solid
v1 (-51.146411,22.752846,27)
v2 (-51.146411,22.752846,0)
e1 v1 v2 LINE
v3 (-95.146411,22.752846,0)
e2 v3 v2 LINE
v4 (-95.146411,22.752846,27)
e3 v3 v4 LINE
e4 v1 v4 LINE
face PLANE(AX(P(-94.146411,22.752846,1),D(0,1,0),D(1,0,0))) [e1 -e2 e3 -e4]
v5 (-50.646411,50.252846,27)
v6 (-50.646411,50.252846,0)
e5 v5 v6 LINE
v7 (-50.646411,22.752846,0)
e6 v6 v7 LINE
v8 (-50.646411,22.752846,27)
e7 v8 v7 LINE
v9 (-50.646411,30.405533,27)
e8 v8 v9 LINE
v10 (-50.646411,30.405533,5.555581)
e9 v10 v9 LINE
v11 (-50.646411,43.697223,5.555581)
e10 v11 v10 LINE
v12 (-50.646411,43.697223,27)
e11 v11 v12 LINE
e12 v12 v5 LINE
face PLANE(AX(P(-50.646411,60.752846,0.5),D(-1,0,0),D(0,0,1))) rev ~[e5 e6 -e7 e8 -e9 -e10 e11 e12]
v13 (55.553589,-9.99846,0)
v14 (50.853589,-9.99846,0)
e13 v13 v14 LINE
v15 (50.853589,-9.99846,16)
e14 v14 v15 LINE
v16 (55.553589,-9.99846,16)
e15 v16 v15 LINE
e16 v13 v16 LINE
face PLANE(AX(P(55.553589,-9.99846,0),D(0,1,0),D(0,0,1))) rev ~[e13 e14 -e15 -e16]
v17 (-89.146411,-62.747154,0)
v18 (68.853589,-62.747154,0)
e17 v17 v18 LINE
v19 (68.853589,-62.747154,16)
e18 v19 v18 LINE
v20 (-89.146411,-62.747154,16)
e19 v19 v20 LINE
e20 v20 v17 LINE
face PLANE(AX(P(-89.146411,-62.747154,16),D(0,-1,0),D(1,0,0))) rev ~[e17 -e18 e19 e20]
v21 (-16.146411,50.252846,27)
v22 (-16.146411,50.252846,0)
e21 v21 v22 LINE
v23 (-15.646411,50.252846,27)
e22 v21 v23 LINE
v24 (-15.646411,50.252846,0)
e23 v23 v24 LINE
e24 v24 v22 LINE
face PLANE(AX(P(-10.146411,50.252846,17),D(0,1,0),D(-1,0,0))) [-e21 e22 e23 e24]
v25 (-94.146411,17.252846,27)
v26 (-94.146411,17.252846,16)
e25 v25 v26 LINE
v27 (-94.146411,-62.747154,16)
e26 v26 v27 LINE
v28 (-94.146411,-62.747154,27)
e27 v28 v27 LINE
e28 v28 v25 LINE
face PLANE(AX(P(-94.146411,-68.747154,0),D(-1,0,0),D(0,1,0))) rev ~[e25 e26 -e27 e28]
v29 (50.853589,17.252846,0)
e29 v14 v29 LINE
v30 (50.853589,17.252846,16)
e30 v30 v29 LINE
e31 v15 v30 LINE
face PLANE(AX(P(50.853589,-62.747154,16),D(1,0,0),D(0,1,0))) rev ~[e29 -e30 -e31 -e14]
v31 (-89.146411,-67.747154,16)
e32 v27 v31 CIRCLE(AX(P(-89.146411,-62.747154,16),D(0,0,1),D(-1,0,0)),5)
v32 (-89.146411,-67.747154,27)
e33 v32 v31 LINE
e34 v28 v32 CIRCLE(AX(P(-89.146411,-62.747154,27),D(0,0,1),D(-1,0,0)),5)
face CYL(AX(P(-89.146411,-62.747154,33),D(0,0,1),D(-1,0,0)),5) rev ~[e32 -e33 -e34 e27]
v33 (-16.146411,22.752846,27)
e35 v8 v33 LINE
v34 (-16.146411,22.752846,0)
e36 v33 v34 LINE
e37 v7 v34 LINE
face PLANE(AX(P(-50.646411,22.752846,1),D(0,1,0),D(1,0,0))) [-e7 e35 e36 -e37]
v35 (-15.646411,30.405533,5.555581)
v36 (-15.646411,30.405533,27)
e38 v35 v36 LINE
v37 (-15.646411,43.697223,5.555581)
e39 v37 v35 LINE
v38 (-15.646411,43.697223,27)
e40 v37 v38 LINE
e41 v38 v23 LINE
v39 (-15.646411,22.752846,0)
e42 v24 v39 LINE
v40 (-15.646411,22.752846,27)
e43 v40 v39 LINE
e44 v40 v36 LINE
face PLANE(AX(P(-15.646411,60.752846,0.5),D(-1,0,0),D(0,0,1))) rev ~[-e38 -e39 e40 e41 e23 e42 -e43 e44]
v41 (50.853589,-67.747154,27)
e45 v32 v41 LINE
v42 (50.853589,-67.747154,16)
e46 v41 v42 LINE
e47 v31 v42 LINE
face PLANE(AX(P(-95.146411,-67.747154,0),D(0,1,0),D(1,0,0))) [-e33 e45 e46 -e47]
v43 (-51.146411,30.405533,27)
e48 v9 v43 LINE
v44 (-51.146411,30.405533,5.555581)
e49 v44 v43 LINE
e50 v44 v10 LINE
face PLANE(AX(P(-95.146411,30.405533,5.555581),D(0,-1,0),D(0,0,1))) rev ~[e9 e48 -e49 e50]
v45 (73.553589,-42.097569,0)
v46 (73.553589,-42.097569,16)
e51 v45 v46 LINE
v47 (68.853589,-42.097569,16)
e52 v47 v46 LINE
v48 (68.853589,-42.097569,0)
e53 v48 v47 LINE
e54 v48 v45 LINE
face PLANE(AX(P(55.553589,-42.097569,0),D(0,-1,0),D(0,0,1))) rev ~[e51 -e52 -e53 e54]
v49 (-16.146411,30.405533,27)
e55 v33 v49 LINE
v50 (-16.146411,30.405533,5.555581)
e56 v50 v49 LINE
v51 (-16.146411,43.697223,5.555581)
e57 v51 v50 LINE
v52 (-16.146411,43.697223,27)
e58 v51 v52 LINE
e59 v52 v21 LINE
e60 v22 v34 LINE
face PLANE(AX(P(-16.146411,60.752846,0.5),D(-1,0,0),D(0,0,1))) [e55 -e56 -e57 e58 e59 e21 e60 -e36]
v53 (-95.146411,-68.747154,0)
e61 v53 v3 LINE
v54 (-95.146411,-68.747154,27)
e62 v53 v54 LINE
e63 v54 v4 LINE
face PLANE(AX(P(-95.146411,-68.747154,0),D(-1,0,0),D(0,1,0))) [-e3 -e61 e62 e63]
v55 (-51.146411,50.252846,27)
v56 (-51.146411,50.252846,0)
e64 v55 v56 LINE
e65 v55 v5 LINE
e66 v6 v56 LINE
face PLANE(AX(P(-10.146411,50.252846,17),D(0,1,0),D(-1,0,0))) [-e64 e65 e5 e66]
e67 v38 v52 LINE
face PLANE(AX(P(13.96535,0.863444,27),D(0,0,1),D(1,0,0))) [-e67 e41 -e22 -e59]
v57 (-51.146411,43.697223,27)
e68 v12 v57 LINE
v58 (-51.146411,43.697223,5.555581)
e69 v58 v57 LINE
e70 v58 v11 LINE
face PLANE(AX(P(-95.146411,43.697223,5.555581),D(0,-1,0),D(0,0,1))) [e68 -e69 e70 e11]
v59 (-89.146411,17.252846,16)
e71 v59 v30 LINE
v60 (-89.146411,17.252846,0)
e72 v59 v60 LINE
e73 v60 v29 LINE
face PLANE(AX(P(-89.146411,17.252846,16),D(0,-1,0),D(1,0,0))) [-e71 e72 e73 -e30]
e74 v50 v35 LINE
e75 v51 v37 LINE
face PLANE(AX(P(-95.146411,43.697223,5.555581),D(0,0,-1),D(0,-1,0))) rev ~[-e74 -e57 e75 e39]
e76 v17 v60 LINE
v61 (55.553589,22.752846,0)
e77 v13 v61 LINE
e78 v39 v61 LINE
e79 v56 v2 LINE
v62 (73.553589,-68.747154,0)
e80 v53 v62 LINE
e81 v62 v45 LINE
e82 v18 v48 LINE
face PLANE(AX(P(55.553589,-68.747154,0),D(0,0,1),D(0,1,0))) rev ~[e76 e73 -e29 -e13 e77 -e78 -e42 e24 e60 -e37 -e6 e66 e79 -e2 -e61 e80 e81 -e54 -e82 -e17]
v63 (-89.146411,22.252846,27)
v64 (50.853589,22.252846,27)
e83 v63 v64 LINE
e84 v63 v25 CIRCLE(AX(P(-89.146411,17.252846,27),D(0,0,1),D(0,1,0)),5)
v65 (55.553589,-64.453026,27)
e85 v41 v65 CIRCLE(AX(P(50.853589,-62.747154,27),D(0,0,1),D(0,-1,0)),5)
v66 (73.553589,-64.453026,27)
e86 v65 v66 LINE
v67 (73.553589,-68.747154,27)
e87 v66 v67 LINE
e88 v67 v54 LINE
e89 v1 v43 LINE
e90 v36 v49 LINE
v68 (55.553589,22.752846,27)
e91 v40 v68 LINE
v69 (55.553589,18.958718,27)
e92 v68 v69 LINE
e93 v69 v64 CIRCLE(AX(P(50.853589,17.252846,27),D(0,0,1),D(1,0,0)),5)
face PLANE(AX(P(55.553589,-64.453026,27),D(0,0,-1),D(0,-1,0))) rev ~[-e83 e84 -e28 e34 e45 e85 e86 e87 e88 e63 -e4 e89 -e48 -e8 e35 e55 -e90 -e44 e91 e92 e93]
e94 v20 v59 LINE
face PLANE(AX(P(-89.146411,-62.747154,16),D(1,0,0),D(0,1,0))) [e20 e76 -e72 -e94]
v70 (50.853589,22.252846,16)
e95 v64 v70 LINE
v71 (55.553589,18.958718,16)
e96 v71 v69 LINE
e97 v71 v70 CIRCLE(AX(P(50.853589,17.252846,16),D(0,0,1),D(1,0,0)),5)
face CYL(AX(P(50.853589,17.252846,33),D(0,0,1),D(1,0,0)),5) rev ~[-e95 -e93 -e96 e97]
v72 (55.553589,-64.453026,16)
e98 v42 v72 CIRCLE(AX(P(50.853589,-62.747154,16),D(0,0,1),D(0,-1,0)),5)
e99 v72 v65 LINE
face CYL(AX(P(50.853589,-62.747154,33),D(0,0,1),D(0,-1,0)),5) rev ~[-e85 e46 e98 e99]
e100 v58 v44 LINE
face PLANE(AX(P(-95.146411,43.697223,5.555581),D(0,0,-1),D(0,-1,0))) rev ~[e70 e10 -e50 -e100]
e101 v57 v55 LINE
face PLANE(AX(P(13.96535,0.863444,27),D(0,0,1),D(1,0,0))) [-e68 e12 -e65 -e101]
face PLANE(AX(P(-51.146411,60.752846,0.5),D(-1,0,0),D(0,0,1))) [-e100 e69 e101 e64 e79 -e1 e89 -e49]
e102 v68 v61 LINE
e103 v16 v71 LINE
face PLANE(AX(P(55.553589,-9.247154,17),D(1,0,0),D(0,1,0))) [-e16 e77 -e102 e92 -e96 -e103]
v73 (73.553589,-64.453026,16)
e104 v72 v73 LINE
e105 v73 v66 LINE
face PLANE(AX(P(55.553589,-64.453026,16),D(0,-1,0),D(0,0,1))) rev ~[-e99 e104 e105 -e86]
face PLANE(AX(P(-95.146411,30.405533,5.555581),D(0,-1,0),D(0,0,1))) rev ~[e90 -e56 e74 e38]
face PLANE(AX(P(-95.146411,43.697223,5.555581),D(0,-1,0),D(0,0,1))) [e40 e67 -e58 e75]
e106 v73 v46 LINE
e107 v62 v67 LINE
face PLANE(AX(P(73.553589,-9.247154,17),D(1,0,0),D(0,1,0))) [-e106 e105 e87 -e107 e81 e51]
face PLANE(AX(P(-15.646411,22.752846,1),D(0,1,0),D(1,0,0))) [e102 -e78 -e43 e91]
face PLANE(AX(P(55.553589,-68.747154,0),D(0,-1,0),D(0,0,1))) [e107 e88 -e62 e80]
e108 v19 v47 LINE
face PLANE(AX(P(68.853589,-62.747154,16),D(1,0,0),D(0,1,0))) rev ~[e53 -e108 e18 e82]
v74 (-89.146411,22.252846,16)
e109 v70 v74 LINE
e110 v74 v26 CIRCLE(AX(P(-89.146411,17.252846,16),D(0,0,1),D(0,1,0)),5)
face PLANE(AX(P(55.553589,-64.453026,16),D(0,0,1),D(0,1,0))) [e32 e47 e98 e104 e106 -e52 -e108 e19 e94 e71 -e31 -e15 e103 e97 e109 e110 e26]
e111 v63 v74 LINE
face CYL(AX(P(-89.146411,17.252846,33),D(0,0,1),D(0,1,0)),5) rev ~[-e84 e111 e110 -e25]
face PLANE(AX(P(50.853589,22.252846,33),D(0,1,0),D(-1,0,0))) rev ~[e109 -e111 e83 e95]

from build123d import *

# Parameters (mm, degrees)
F0_W          = 170
F0_H          = 130
F1_DEPTH      = 34
F2_T          = -1
F3_W          = 43.5
F3_H          = 38
F4_DEPTH      = 32
F5_T          = 0.5
F5_T3_DEPTH   = 34
F5_T5_DEPTH   = 125.5
F5_T7_DEPTH   = 33
F5_T9_DEPTH   = 2
F5_T11_DEPTH  = 129
F5_T13_DEPTH  = 169
F5_T15_DEPTH  = 91
F5_T17_DEPTH  = 44.5
F5_T19_DEPTH  = 39
F6_W          = 35
F6_H          = 38
F7_DEPTH      = 32
F8_T          = 0.5
F8_T3_DEPTH   = 2
F8_T5_DEPTH   = 33
F8_T7_DEPTH   = 91
F8_T9_DEPTH   = 34
F8_T11_DEPTH  = 79.5
F8_T13_DEPTH  = 169
F8_T15_DEPTH  = 129
F8_T17_DEPTH  = 90.5
F8_T19_DEPTH  = 39
F8_T21_DEPTH  = 44.5
F8_T23_DEPTH  = 33.5
F8_T25_DEPTH  = 1.5
F8_T27_DEPTH  = 39
F8_T29_DEPTH  = 33
F8_T31_DEPTH  = 1.5
F8_T33_DEPTH  = 1.5
F8_T35_DEPTH  = 38.5
F8_T37_DEPTH  = 1.5000245068
F8_T39_DEPTH  = 1.5000245068
F8_T41_DEPTH  = 44
F9_W          = 89.5
F9_H          = 38
F10_DEPTH     = 32
F11_T         = 0.5
F11_T3_DEPTH  = 2
F11_T5_DEPTH  = 33
F11_T7_DEPTH  = 91
F11_T9_DEPTH  = 34
F11_T11_DEPTH = 169
F11_T13_DEPTH = 44.5
F11_T15_DEPTH = 33.5
F11_T17_DEPTH = 1.5
F11_T19_DEPTH = 39
F11_T21_DEPTH = 33
F11_T23_DEPTH = 1.5
F11_T25_DEPTH = 1.5
F11_T27_DEPTH = 38.5
F11_T29_DEPTH = 1.5000245068
F11_T31_DEPTH = 1.5000245068
F11_T33_DEPTH = 44
F11_T35_DEPTH = 35.5
F12_W         = 150
F12_H         = 90
F13_DEPTH     = 32
F15_DEPTH     = 17
F16_W         = 140
F16_H         = 80
F17_DEPTH     = 25
F18_DEPTH     = 25
F19_DEPTH     = 25
F20_DEPTH     = 25
F21_DEPTH     = 25
F24_W         = 170
F24_H         = 34
F25_DEPTH     = 11
F26_W         = 119
F26_H         = 34
F27_DEPTH     = 19.3
F28_W         = 32.0991082117
F28_H         = 16
F29_DEPTH     = 25
F30_W         = 13.2916904986
F30_H         = 28.4444186985
F31_DEPTH     = 96.3
F32_W         = 236.7293909192
F32_H         = 199.1855278611
F33_DEPTH     = 7
F34_DEPTH     = 18
F35_DEPTH     = 18
F36_DEPTH     = 27.5


# Not quite as in the source:
# - a feature of the source that left no trace in its solid (it failed there, or was rolled back) is left out
# - a shell that OpenCascade refuses in one call is made with other operations: the cavity is built on its own and cut out


with BuildPart() as f1:
    # F0 (on Top) → F1 (new body)
    with BuildSketch(Plane.XY):
        with Locations((-10.1464114764, -3.7471540272)):
            Rectangle(F0_W, F0_H)
    extrude(amount=F1_DEPTH)

    # F2
    f2_openings = [f1.faces().sort_by_distance(p)[0] for p in [
        (-10.146411, -3.747154, 34),
    ]]
    offset(amount=F2_T, openings=f2_openings)

    # F3 (on face) → F4 (join)
    with BuildSketch(Plane.XY.offset(1)):
        with Locations((-72.3964114764, 41.2528459728)):
            Rectangle(F3_W, F3_H)
    extrude(amount=F4_DEPTH)

    # F5: shell of thickness 0.5, made by hand


with BuildPart() as f5_core1:
    # F5_t2: copy of F1
    add(f1.part)

    # the walls: a layer under each face that stays
    f5_faces = [f5_core1.faces().sort_by_distance(p)[0] for p in [
        (-10.1464114764, 61.2528459728, 17),
        (74.8535885236, -3.7471540272, 17),
        (-95.1464114764, -3.7471540272, 17),
        (-10.1464114764, -3.7471540272, 0),
        (-3.5057864764, -68.2121746034, 34),
        (-10.1464114764, -68.7471540272, 17),
        (-10.1464114764, 60.2528459728, 17.5),
        (73.8535885236, -3.7471540272, 17.5),
        (-10.1464114764, -67.7471540272, 17.5),
        (-94.1464114764, -3.7471540272, 17.5),
        (-10.1464114764, -3.7471540272, 1),
        (-50.6464114764, 41.2528459728, 17),
        (-72.3964114764, 22.2528459728, 17),
    ]]
    thicken(f5_faces, amount=-F5_T, mode=Mode.SUBTRACT)

    # F5_s4 → F5_t3 (cut)
    with BuildSketch(Plane.XY.offset(0.5)):
        Polygon((73.8485885236, 60.2478459728), (73.8535885236, 60.7528459728), (74.3535885236, 60.7528459728), (74.3535885236, 60.2528459728), align=None)
        Polygon((73.8485885236, -67.7421540272), (74.3535885236, -67.7471540272), (74.3535885236, -68.2471540272), (73.8535885236, -68.2471540272), align=None)
        Polygon((-94.1414114764, -67.7421540272), (-94.1464114764, -68.2471540272), (-94.6464114764, -68.2471540272), (-94.6464114764, -67.7471540272), align=None)
    extrude(amount=F5_T3_DEPTH, mode=Mode.SUBTRACT)

    # F5_s6 → F5_t5 (cut)
    with BuildSketch(Plane.YZ.offset(-51.1464114764)):
        Polygon((60.2478459728, 1.005), (60.7528459728, 1), (60.7528459728, 0.5), (60.2528459728, 0.5), align=None)
    extrude(amount=F5_T5_DEPTH, mode=Mode.SUBTRACT)

    # F5_s8 → F5_t7 (cut)
    with BuildSketch(Plane.XY.offset(0.5)):
        Polygon((-50.6414114764, 60.2478459728), (-50.6464114764, 60.7528459728), (-51.1464114764, 60.7528459728), (-51.1464114764, 60.2528459728), align=None)
        Polygon((-94.1414114764, 22.2478459728), (-94.6464114764, 22.2528459728), (-94.6464114764, 22.7528459728), (-94.1464114764, 22.7528459728), align=None)
    extrude(amount=F5_T7_DEPTH, mode=Mode.SUBTRACT)

    # F5_s10 → F5_t9 (cut)
    with BuildSketch(Plane.XY.offset(32.5)):
        Polygon((-94.1414114764, 60.2478459728), (-94.1464114764, 60.7528459728), (-94.6464114764, 60.7528459728), (-94.6464114764, 60.2528459728), align=None)
    extrude(amount=F5_T9_DEPTH, mode=Mode.SUBTRACT)

    # F5_s12 → F5_t11 (cut)
    with BuildSketch(Plane.XZ.offset(-60.7528459728)):
        Polygon((73.8485885236, 1.005), (74.3535885236, 1), (74.3535885236, 0.5), (73.8535885236, 0.5), align=None)
    extrude(amount=F5_T11_DEPTH, mode=Mode.SUBTRACT)

    # F5_s14 → F5_t13 (cut)
    with BuildSketch(Plane.YZ.offset(-94.6464114764)):
        Polygon((-67.7421540272, 1.005), (-68.2471540272, 1), (-68.2471540272, 0.5), (-67.7471540272, 0.5), align=None)
    extrude(amount=F5_T13_DEPTH, mode=Mode.SUBTRACT)

    # F5_s16 → F5_t15 (cut)
    with BuildSketch(Plane.XZ.offset(-22.7528459728)):
        Polygon((-94.1414114764, 1.005), (-94.6464114764, 1), (-94.6464114764, 0.5), (-94.1464114764, 0.5), align=None)
    extrude(amount=F5_T15_DEPTH, mode=Mode.SUBTRACT)

    # F5_s18 → F5_t17 (cut)
    with BuildSketch(Plane.YZ.offset(-94.6464114764)):
        Polygon((22.2478459728, 1.005), (22.2528459728, 0.5), (22.7528459728, 0.5), (22.7528459728, 1), align=None)
    extrude(amount=F5_T17_DEPTH, mode=Mode.SUBTRACT)

    # F5_s20 → F5_t19 (cut)
    with BuildSketch(Plane.XZ.offset(-60.7528459728)):
        Polygon((-50.6414114764, 1.005), (-50.6464114764, 0.5), (-51.1464114764, 0.5), (-51.1464114764, 1), align=None)
    extrude(amount=F5_T19_DEPTH, mode=Mode.SUBTRACT)


with BuildPart() as f1_1:
    add(f1.part)

    # what is left inside the walls is the cavity
    f5_cavity = [f5_core1.part.solids().sort_by_distance(p)[0] for p in [
        (-72.896411, 35.419513, 0.505),
    ]]
    add(f5_cavity, mode=Mode.SUBTRACT)

    # F6 (on face) → F7 (join)
    with BuildSketch(Plane.XY.offset(1)):
        with Locations((-33.1464114764, 41.2528459728)):
            Rectangle(F6_W, F6_H)
    extrude(amount=F7_DEPTH)

    # F8: shell of thickness 0.5, made by hand


with BuildPart() as f8_core1:
    # F8_t2: copy of F1
    add(f1_1.part)

    # the walls: a layer under each face that stays
    f8_faces = [f8_core1.faces().sort_by_distance(p)[0] for p in [
        (-10.1464114764, 61.2528459728, 17),
        (-3.5057864764, -68.2121746034, 34),
        (-94.1464114764, -3.7471540272, 17.5),
        (-10.1464114764, -3.7471540272, 1),
        (-15.6464114764, 41.2528459728, 17),
        (-54.8964114764, 22.2528459728, 17),
        (-72.8964114764, 22.7528459728, 16.75),
        (-94.6464114764, 41.7528459728, 16.75),
        (-94.3939114764, 60.2503459728, 32.75),
        (-94.1439114764, 60.5003459728, 32.75),
        (-72.6464114764, 60.5028459728, 33),
        (-94.3939114764, 60.5003459728, 32.5),
        (-72.8964114764, 60.7528459728, 16.75),
        (-72.8964114764, 41.7528459728, 0.5),
        (-51.1464114764, 41.7528459728, 16.75),
        (-94.3964114764, 41.5028459728, 33),
        (-10.1464114764, -67.7471540272, 17.5),
        (73.8535885236, -3.7471540272, 17.5),
        (-10.1464114764, 60.2528459728, 17.5),
        (-10.1464114764, -68.7471540272, 17),
        (-10.1464114764, -3.7471540272, 0),
        (-95.1464114764, -3.7471540272, 17),
        (74.8535885236, -3.7471540272, 17),
    ]]
    thicken(f8_faces, amount=-F8_T, mode=Mode.SUBTRACT)

    # F8_s4 → F8_t3 (cut)
    with BuildSketch(Plane.XY.offset(32.5)):
        Polygon((-94.1414114764, 60.2478459728), (-94.6464114764, 60.2528459728), (-94.6464114764, 60.7528459728), (-94.1464114764, 60.7528459728), align=None)
    extrude(amount=F8_T3_DEPTH, mode=Mode.SUBTRACT)

    # F8_s6 → F8_t5 (cut)
    with BuildSketch(Plane.XY.offset(0.5)):
        Polygon((-94.1414114764, 22.2478459728), (-94.6464114764, 22.2528459728), (-94.6464114764, 22.7528459728), (-94.1464114764, 22.7528459728), align=None)
        Polygon((-15.6414114764, 60.2478459728), (-16.1464114764, 60.2528459728), (-16.1464114764, 60.7528459728), (-15.6464114764, 60.7528459728), align=None)
    extrude(amount=F8_T5_DEPTH, mode=Mode.SUBTRACT)

    # F8_s8 → F8_t7 (cut)
    with BuildSketch(Plane.XZ.offset(-22.7528459728)):
        Polygon((-94.1414114764, 1.005), (-94.6464114764, 1), (-94.6464114764, 0.5), (-94.1464114764, 0.5), align=None)
    extrude(amount=F8_T7_DEPTH, mode=Mode.SUBTRACT)

    # F8_s10 → F8_t9 (cut)
    with BuildSketch(Plane.XY.offset(0.5)):
        Polygon((-94.1414114764, -67.7421540272), (-94.6464114764, -67.7471540272), (-94.6464114764, -68.2471540272), (-94.1464114764, -68.2471540272), align=None)
        Polygon((73.8485885236, -67.7421540272), (73.8535885236, -68.2471540272), (74.3535885236, -68.2471540272), (74.3535885236, -67.7471540272), align=None)
        Polygon((73.8485885236, 60.2478459728), (74.3535885236, 60.2528459728), (74.3535885236, 60.7528459728), (73.8535885236, 60.7528459728), align=None)
    extrude(amount=F8_T9_DEPTH, mode=Mode.SUBTRACT)

    # F8_s12 → F8_t11 (cut)
    with BuildSketch(Plane.YZ.offset(-94.6464114764)):
        Polygon((22.2478459728, 1.005), (22.2528459728, 0.5), (22.7528459728, 0.5), (22.7528459728, 1), align=None)
    extrude(amount=F8_T11_DEPTH, mode=Mode.SUBTRACT)

    # F8_s14 → F8_t13 (cut)
    with BuildSketch(Plane.YZ.offset(-94.6464114764)):
        Polygon((-67.7421540272, 1.005), (-67.7471540272, 0.5), (-68.2471540272, 0.5), (-68.2471540272, 1), align=None)
    extrude(amount=F8_T13_DEPTH, mode=Mode.SUBTRACT)

    # F8_s16 → F8_t15 (cut)
    with BuildSketch(Plane.XZ.offset(-60.7528459728)):
        Polygon((73.8485885236, 1.005), (73.8535885236, 0.5), (74.3535885236, 0.5), (74.3535885236, 1), align=None)
    extrude(amount=F8_T15_DEPTH, mode=Mode.SUBTRACT)

    # F8_s18 → F8_t17 (cut)
    with BuildSketch(Plane.YZ.offset(-16.1464114764)):
        Polygon((60.2478459728, 1.005), (60.2528459728, 0.5), (60.7528459728, 0.5), (60.7528459728, 1), align=None)
    extrude(amount=F8_T17_DEPTH, mode=Mode.SUBTRACT)

    # F8_s20 → F8_t19 (cut)
    with BuildSketch(Plane.XZ.offset(-60.7528459728)):
        Polygon((-15.6414114764, 1.005), (-15.6464114764, 0.5), (-16.1464114764, 0.5), (-16.1464114764, 1), align=None)
    extrude(amount=F8_T19_DEPTH, mode=Mode.SUBTRACT)

    # F8_s22 → F8_t21 (cut)
    with BuildSketch(Plane.YZ.offset(-95.1464114764)):
        Polygon((22.7578459728, 0.505), (22.2528459728, 0.5), (22.2528459728, 0), (22.7528459728, 0), align=None)
        Polygon((60.7478459728, 0.505), (61.2528459728, 0.5), (61.2528459728, 0), (60.7528459728, 0), align=None)
    extrude(amount=F8_T21_DEPTH, mode=Mode.SUBTRACT)

    # F8_s24 → F8_t23 (cut)
    with BuildSketch(Plane.XY):
        Polygon((-94.6414114764, 22.7578459728), (-94.6464114764, 22.2528459728), (-95.1464114764, 22.2528459728), (-95.1464114764, 22.7528459728), align=None)
        Polygon((-51.1514114764, 22.7578459728), (-51.1464114764, 22.2528459728), (-50.6464114764, 22.2528459728), (-50.6464114764, 22.7528459728), align=None)
        Polygon((-51.1514114764, 60.7478459728), (-51.1464114764, 61.2528459728), (-50.6464114764, 61.2528459728), (-50.6464114764, 60.7528459728), align=None)
    extrude(amount=F8_T23_DEPTH, mode=Mode.SUBTRACT)

    # F8_s26 → F8_t25 (cut)
    with BuildSketch(Plane.YZ.offset(-95.1464114764)):
        Polygon((22.7578459728, 32.995), (22.2528459728, 33), (22.2528459728, 33.5), (22.7528459728, 33.5), align=None)
        Polygon((60.7478459728, 32.495), (60.7528459728, 33), (61.2528459728, 33), (61.2528459728, 32.5), align=None)
    extrude(amount=F8_T25_DEPTH, mode=Mode.SUBTRACT)

    # F8_s28 → F8_t27 (cut)
    with BuildSketch(Plane.XZ.offset(-61.2528459728)):
        Polygon((-94.6414114764, 0.505), (-95.1464114764, 0.5), (-95.1464114764, 0), (-94.6464114764, 0), align=None)
        Polygon((-51.1514114764, 0.505), (-51.1464114764, 0), (-50.6464114764, 0), (-50.6464114764, 0.5), align=None)
    extrude(amount=F8_T27_DEPTH, mode=Mode.SUBTRACT)

    # F8_s30 → F8_t29 (cut)
    with BuildSketch(Plane.XY):
        Polygon((-94.6414114764, 60.7478459728), (-95.1464114764, 60.7528459728), (-95.1464114764, 61.2528459728), (-94.6464114764, 61.2528459728), align=None)
    extrude(amount=F8_T29_DEPTH, mode=Mode.SUBTRACT)

    # F8_s32 → F8_t31 (cut)
    with BuildSketch(Plane.XZ.offset(-61.2528459728)):
        Polygon((-94.6414114764, 32.495), (-95.1464114764, 32.5), (-95.1464114764, 33), (-94.6464114764, 33), align=None)
        Polygon((-51.1514114764, 32.995), (-51.1464114764, 33.5), (-50.6464114764, 33.5), (-50.6464114764, 33), align=None)
    extrude(amount=F8_T31_DEPTH, mode=Mode.SUBTRACT)

    # F8_s34 → F8_t33 (cut)
    with BuildSketch(Plane.XY.offset(32)):
        Polygon((-94.6414609789, 60.2478462179), (-95.1464114764, 60.2528459728), (-95.1464114764, 60.7578209747), (-94.641461224, 60.7528214672), align=None)
        Polygon((-94.1414117215, 60.7478954753), (-94.6463869708, 60.7478957204), (-94.6513864783, 61.2528459728), (-94.1464114764, 61.2528459728), align=None)
    extrude(amount=F8_T33_DEPTH, mode=Mode.SUBTRACT)

    # F8_s36 → F8_t35 (cut)
    with BuildSketch(Plane.XZ.offset(-60.7528459728)):
        Polygon((-94.6414114764, 32.995), (-95.1464114764, 33), (-95.1464114764, 33.5), (-94.6464114764, 33.5), align=None)
    extrude(amount=F8_T35_DEPTH, mode=Mode.SUBTRACT)

    # F8_s38 → F8_t37 (cut)
    with BuildSketch(Plane(origin=(-95.7336140862, 0.9478575652, 0), x_dir=(0, 0, 1), z_dir=(0.9999509888, -0.0099005048, 0))):
        Polygon((32.995, -59.3078456537), (33, -59.8128456537), (33.5, -59.8128456537), (33.5, -59.3128456537), align=None)
    extrude(amount=F8_T37_DEPTH, mode=Mode.SUBTRACT)

    # F8_s40 → F8_t39 (cut)
    with BuildSketch(Plane(origin=(-0.6007818495, 60.6789668039, 0), x_dir=(0, 0, 1), z_dir=(-0.0099005048, 0.9999509888, 0))):
        Polygon((32.995, -93.5353134023), (33, -94.0403134023), (33.5, -94.0403134023), (33.5, -93.5403134023), align=None)
    extrude(amount=F8_T39_DEPTH, mode=Mode.SUBTRACT)

    # F8_s42 → F8_t41 (cut)
    with BuildSketch(Plane.YZ.offset(-94.6464114764)):
        Polygon((60.7478459728, 32.995), (60.7528459728, 33.5), (61.2528459728, 33.5), (61.2528459728, 33), align=None)
    extrude(amount=F8_T41_DEPTH, mode=Mode.SUBTRACT)


with BuildPart() as f1_2:
    add(f1_1.part)

    # what is left inside the walls is the cavity
    f8_cavity = [f8_core1.part.solids().sort_by_distance(p)[0] for p in [
        (-33.396411, 35.419513, 32.995),
    ]]
    add(f8_cavity, mode=Mode.SUBTRACT)

    # F9 (on face) → F10 (join)
    with BuildSketch(Plane.XY.offset(1)):
        with Locations((29.1035885236, 41.2528459728)):
            Rectangle(F9_W, F9_H)
    extrude(amount=F10_DEPTH)

    # F11: shell of thickness 0.5, made by hand


with BuildPart() as f11_core1:
    # F11_t2: copy of F1
    add(f1_2.part)

    # the walls: a layer under each face that stays
    f11_faces = [f11_core1.faces().sort_by_distance(p)[0] for p in [
        (-10.1464114764, 61.2528459728, 17),
        (-3.5057864764, -68.2121746034, 34),
        (-94.1464114764, -3.7471540272, 17.5),
        (-10.1464114764, -22.7471540272, 1),
        (-10.1464114764, 22.2528459728, 17),
        (-72.8964114764, 22.7528459728, 16.75),
        (-94.6464114764, 41.7528459728, 16.75),
        (-94.3939114764, 60.2503459728, 32.75),
        (-94.1439114764, 60.5003459728, 32.75),
        (-72.6464114764, 60.5028459728, 33),
        (-94.3939114764, 60.5003459728, 32.5),
        (-72.8964114764, 60.7528459728, 16.75),
        (-72.8964114764, 41.7528459728, 0.5),
        (-51.1464114764, 41.7528459728, 16.75),
        (-50.6464114764, 41.7528459728, 16.75),
        (-33.3964114764, 60.7528459728, 16.75),
        (-33.3964114764, 41.7528459728, 0.5),
        (-33.3964114764, 60.5028459728, 33),
        (-33.3964114764, 22.7528459728, 16.75),
        (-16.1464114764, 41.7528459728, 16.75),
        (-94.3964114764, 41.5028459728, 33),
        (-10.1464114764, -67.7471540272, 17.5),
        (73.8535885236, -3.7471540272, 17.5),
        (-10.1464114764, 60.2528459728, 33.5),
        (-10.1464114764, -68.7471540272, 17),
        (-10.1464114764, -3.7471540272, 0),
        (-95.1464114764, -3.7471540272, 17),
        (74.8535885236, -3.7471540272, 17),
    ]]
    thicken(f11_faces, amount=-F11_T, mode=Mode.SUBTRACT)

    # F11_s4 → F11_t3 (cut)
    with BuildSketch(Plane.XY.offset(32.5)):
        Polygon((-94.1414114764, 60.2478459728), (-94.6464114764, 60.2528459728), (-94.6464114764, 60.7528459728), (-94.1464114764, 60.7528459728), align=None)
        Polygon((73.8485885236, 60.2478459728), (74.3535885236, 60.2528459728), (74.3535885236, 60.7528459728), (73.8535885236, 60.7528459728), align=None)
    extrude(amount=F11_T3_DEPTH, mode=Mode.SUBTRACT)

    # F11_s6 → F11_t5 (cut)
    with BuildSketch(Plane.XY.offset(0.5)):
        Polygon((-94.1414114764, 22.2478459728), (-94.6464114764, 22.2528459728), (-94.6464114764, 22.7528459728), (-94.1464114764, 22.7528459728), align=None)
        Polygon((73.8485885236, 22.2478459728), (73.8535885236, 22.7528459728), (74.3535885236, 22.7528459728), (74.3535885236, 22.2528459728), align=None)
    extrude(amount=F11_T5_DEPTH, mode=Mode.SUBTRACT)

    # F11_s8 → F11_t7 (cut)
    with BuildSketch(Plane.XZ.offset(-22.7528459728)):
        Polygon((-94.1414114764, 1.005), (-94.6464114764, 1), (-94.6464114764, 0.5), (-94.1464114764, 0.5), align=None)
        Polygon((73.8485885236, 1.005), (73.8535885236, 0.5), (74.3535885236, 0.5), (74.3535885236, 1), align=None)
    extrude(amount=F11_T7_DEPTH, mode=Mode.SUBTRACT)

    # F11_s10 → F11_t9 (cut)
    with BuildSketch(Plane.XY.offset(0.5)):
        Polygon((-94.1414114764, -67.7421540272), (-94.6464114764, -67.7471540272), (-94.6464114764, -68.2471540272), (-94.1464114764, -68.2471540272), align=None)
        Polygon((73.8485885236, -67.7421540272), (73.8535885236, -68.2471540272), (74.3535885236, -68.2471540272), (74.3535885236, -67.7471540272), align=None)
    extrude(amount=F11_T9_DEPTH, mode=Mode.SUBTRACT)

    # F11_s12 → F11_t11 (cut)
    with BuildSketch(Plane.YZ.offset(-94.6464114764)):
        Polygon((22.2478459728, 1.005), (22.2528459728, 0.5), (22.7528459728, 0.5), (22.7528459728, 1), align=None)
        Polygon((-67.7421540272, 1.005), (-67.7471540272, 0.5), (-68.2471540272, 0.5), (-68.2471540272, 1), align=None)
    extrude(amount=F11_T11_DEPTH, mode=Mode.SUBTRACT)

    # F11_s14 → F11_t13 (cut)
    with BuildSketch(Plane.YZ.offset(-95.1464114764)):
        Polygon((22.7578459728, 0.505), (22.2528459728, 0.5), (22.2528459728, 0), (22.7528459728, 0), align=None)
        Polygon((60.7478459728, 0.505), (61.2528459728, 0.5), (61.2528459728, 0), (60.7528459728, 0), align=None)
    extrude(amount=F11_T13_DEPTH, mode=Mode.SUBTRACT)

    # F11_s16 → F11_t15 (cut)
    with BuildSketch(Plane.XY):
        Polygon((-94.6414114764, 22.7578459728), (-94.6464114764, 22.2528459728), (-95.1464114764, 22.2528459728), (-95.1464114764, 22.7528459728), align=None)
        Polygon((-51.1514114764, 22.7578459728), (-51.1464114764, 22.2528459728), (-50.6464114764, 22.2528459728), (-50.6464114764, 22.7528459728), align=None)
        Polygon((-51.1514114764, 60.7478459728), (-51.1464114764, 61.2528459728), (-50.6464114764, 61.2528459728), (-50.6464114764, 60.7528459728), align=None)
        Polygon((-50.6414114764, 22.7578459728), (-51.1464114764, 22.7528459728), (-51.1464114764, 22.2528459728), (-50.6464114764, 22.2528459728), align=None)
        Polygon((-50.6414114764, 60.7478459728), (-51.1464114764, 60.7528459728), (-51.1464114764, 61.2528459728), (-50.6464114764, 61.2528459728), align=None)
        Polygon((-16.1514114764, 60.7478459728), (-16.1464114764, 61.2528459728), (-15.6464114764, 61.2528459728), (-15.6464114764, 60.7528459728), align=None)
        Polygon((-16.1514114764, 22.7578459728), (-16.1464114764, 22.2528459728), (-15.6464114764, 22.2528459728), (-15.6464114764, 22.7528459728), align=None)
    extrude(amount=F11_T15_DEPTH, mode=Mode.SUBTRACT)

    # F11_s18 → F11_t17 (cut)
    with BuildSketch(Plane.YZ.offset(-95.1464114764)):
        Polygon((22.7578459728, 32.995), (22.2528459728, 33), (22.2528459728, 33.5), (22.7528459728, 33.5), align=None)
        Polygon((60.7478459728, 32.495), (60.7528459728, 33), (61.2528459728, 33), (61.2528459728, 32.5), align=None)
    extrude(amount=F11_T17_DEPTH, mode=Mode.SUBTRACT)

    # F11_s20 → F11_t19 (cut)
    with BuildSketch(Plane.XZ.offset(-61.2528459728)):
        Polygon((-94.6414114764, 0.505), (-95.1464114764, 0.5), (-95.1464114764, 0), (-94.6464114764, 0), align=None)
        Polygon((-51.1514114764, 0.505), (-51.1464114764, 0), (-50.6464114764, 0), (-50.6464114764, 0.5), align=None)
        Polygon((-50.6414114764, 0.505), (-51.1464114764, 0.5), (-51.1464114764, 0), (-50.6464114764, 0), align=None)
        Polygon((-16.1514114764, 0.505), (-16.1464114764, 0), (-15.6464114764, 0), (-15.6464114764, 0.5), align=None)
    extrude(amount=F11_T19_DEPTH, mode=Mode.SUBTRACT)

    # F11_s22 → F11_t21 (cut)
    with BuildSketch(Plane.XY):
        Polygon((-94.6414114764, 60.7478459728), (-95.1464114764, 60.7528459728), (-95.1464114764, 61.2528459728), (-94.6464114764, 61.2528459728), align=None)
    extrude(amount=F11_T21_DEPTH, mode=Mode.SUBTRACT)

    # F11_s24 → F11_t23 (cut)
    with BuildSketch(Plane.XZ.offset(-61.2528459728)):
        Polygon((-94.6414114764, 32.495), (-95.1464114764, 32.5), (-95.1464114764, 33), (-94.6464114764, 33), align=None)
        Polygon((-51.1514114764, 32.995), (-51.1464114764, 33.5), (-50.6464114764, 33.5), (-50.6464114764, 33), align=None)
        Polygon((-50.6414114764, 32.995), (-51.1464114764, 33), (-51.1464114764, 33.5), (-50.6464114764, 33.5), align=None)
        Polygon((-16.1514114764, 32.995), (-16.1464114764, 33.5), (-15.6464114764, 33.5), (-15.6464114764, 33), align=None)
    extrude(amount=F11_T23_DEPTH, mode=Mode.SUBTRACT)

    # F11_s26 → F11_t25 (cut)
    with BuildSketch(Plane.XY.offset(32)):
        Polygon((-94.6414609789, 60.2478462179), (-95.1464114764, 60.2528459728), (-95.1464114764, 60.7578209747), (-94.641461224, 60.7528214672), align=None)
        Polygon((-94.1414117215, 60.7478954753), (-94.6463869708, 60.7478957204), (-94.6513864783, 61.2528459728), (-94.1464114764, 61.2528459728), align=None)
    extrude(amount=F11_T25_DEPTH, mode=Mode.SUBTRACT)

    # F11_s28 → F11_t27 (cut)
    with BuildSketch(Plane.XZ.offset(-60.7528459728)):
        Polygon((-94.6414114764, 32.995), (-95.1464114764, 33), (-95.1464114764, 33.5), (-94.6464114764, 33.5), align=None)
    extrude(amount=F11_T27_DEPTH, mode=Mode.SUBTRACT)

    # F11_s30 → F11_t29 (cut)
    with BuildSketch(Plane(origin=(-95.7336140862, 0.9478575652, 0), x_dir=(0, 0, 1), z_dir=(0.9999509888, -0.0099005048, 0))):
        Polygon((32.995, -59.3078456537), (33, -59.8128456537), (33.5, -59.8128456537), (33.5, -59.3128456537), align=None)
    extrude(amount=F11_T29_DEPTH, mode=Mode.SUBTRACT)

    # F11_s32 → F11_t31 (cut)
    with BuildSketch(Plane(origin=(-0.6007818495, 60.6789668039, 0), x_dir=(0, 0, 1), z_dir=(-0.0099005048, 0.9999509888, 0))):
        Polygon((32.995, -93.5353134023), (33, -94.0403134023), (33.5, -94.0403134023), (33.5, -93.5403134023), align=None)
    extrude(amount=F11_T31_DEPTH, mode=Mode.SUBTRACT)

    # F11_s34 → F11_t33 (cut)
    with BuildSketch(Plane.YZ.offset(-94.6464114764)):
        Polygon((60.7478459728, 32.995), (60.7528459728, 33.5), (61.2528459728, 33.5), (61.2528459728, 33), align=None)
    extrude(amount=F11_T33_DEPTH, mode=Mode.SUBTRACT)

    # F11_s36 → F11_t35 (cut)
    with BuildSketch(Plane.YZ.offset(-51.1464114764)):
        Polygon((60.7478459728, 0.505), (61.2528459728, 0.5), (61.2528459728, 0), (60.7528459728, 0), align=None)
        Polygon((60.7478459728, 32.995), (61.2528459728, 33), (61.2528459728, 33.5), (60.7528459728, 33.5), align=None)
        Polygon((22.7578459728, 0.505), (22.7528459728, 0), (22.2528459728, 0), (22.2528459728, 0.5), align=None)
    extrude(amount=F11_T35_DEPTH, mode=Mode.SUBTRACT)


with BuildPart() as f1_3:
    add(f1_2.part)

    # what is left inside the walls is the cavity
    f11_cavity = [f11_core1.part.solids().sort_by_distance(p)[0] for p in [
        (29.353589, 35.419513, 0.505),
    ]]
    add(f11_cavity, mode=Mode.SUBTRACT)

    # F12 (on face) → F13 (join)
    with BuildSketch(Plane.XY.offset(1)):
        with Locations((-19.1464114764, -22.7471540272)):
            Rectangle(F12_W, F12_H)
    extrude(amount=F13_DEPTH)

    # F14 (on face) → F15 (cut)
    with BuildSketch(Plane.XY.offset(33)):
        with BuildLine():
            Line((50.8535885236, 22.2528459728), (-89.1464114764, 22.2528459728))
            ThreePointArc((-89.1464114764, 22.2528459728), (-92.6819453823, 20.7883798787), (-94.1464114764, 17.2528459728))
            Line((-94.1464114764, 17.2528459728), (-94.1464114764, -62.7471540272))
            ThreePointArc((-94.1464114764, -62.7471540272), (-92.6819453823, -66.2826879332), (-89.1464114764, -67.7471540272))
            Line((-89.1464114764, -67.7471540272), (50.8535885236, -67.7471540272))
            ThreePointArc((50.8535885236, -67.7471540272), (54.3891224295, -66.2826879332), (55.8535885236, -62.7471540272))
            Line((55.8535885236, -62.7471540272), (55.8535885236, 17.2528459728))
            ThreePointArc((55.8535885236, 17.2528459728), (54.3891224295, 20.7883798787), (50.8535885236, 22.2528459728))
        make_face()
    extrude(amount=-F15_DEPTH, mode=Mode.SUBTRACT)

    # F16 (on face) → F17 (cut)
    with BuildSketch(Plane.XY.offset(16)):
        with Locations((-19.1464114764, -22.7471540272)):
            Rectangle(F16_W, F16_H)
    extrude(amount=-F17_DEPTH, mode=Mode.SUBTRACT)

    # F18 (cut): a face of the model
    f18_faces = [f1_3.faces().sort_by_distance(p)[0] for p in [
        (-72.8964114764, 41.7528459728, 0.5),
    ]]
    extrude(f18_faces, amount=-F18_DEPTH, mode=Mode.SUBTRACT)

    # F19 (cut): a face of the model
    f19_faces = [f1_3.faces().sort_by_distance(p)[0] for p in [
        (-33.3964114764, 41.7528459728, 0.5),
    ]]
    extrude(f19_faces, amount=-F19_DEPTH, mode=Mode.SUBTRACT)

    # F20 (cut): a face of the model
    f20_faces = [f1_3.faces().sort_by_distance(p)[0] for p in [
        (29.3535885236, 41.7528459728, 0.5),
    ]]
    extrude(f20_faces, amount=-F20_DEPTH, mode=Mode.SUBTRACT)

    # F21 (cut): a face of the model
    f21_faces = [f1_3.faces().sort_by_distance(p)[0] for p in [
        (64.8535885236, -22.7471540272, 1),
    ]]
    extrude(f21_faces, amount=-F21_DEPTH, mode=Mode.SUBTRACT)

    # F24 (on face) → F25 (cut)
    with BuildSketch(Plane(origin=(0, 61.2528459728, 0), x_dir=(-1, 0, 0), z_dir=(0, 1, 0))):
        with Locations((10.1464114764, 17)):
            Rectangle(F24_W, F24_H)
    extrude(amount=-F25_DEPTH, mode=Mode.SUBTRACT)

    # F26 (on face) → F27 (cut)
    with BuildSketch(Plane.YZ.offset(74.8535885236)):
        with Locations((-9.2471540272, 17)):
            Rectangle(F26_W, F26_H)
    extrude(amount=-F27_DEPTH, mode=Mode.SUBTRACT)

    # F28 (on face) → F29 (cut)
    with BuildSketch(Plane.YZ.offset(55.5535885236)):
        with Locations((-26.0480144061, 8)):
            Rectangle(F28_W, F28_H)
    extrude(amount=-F29_DEPTH, mode=Mode.SUBTRACT)

    # F30 (on face) → F31 (cut)
    with BuildSketch(Plane(origin=(-95.1464114764, 0, 0), x_dir=(0, -1, 0), z_dir=(-1, 0, 0))):
        with Locations((-37.051377818, 19.7777906507)):
            Rectangle(F30_W, F30_H)
    extrude(amount=-F31_DEPTH, mode=Mode.SUBTRACT)

    # F32 (on face) → F33 (cut)
    with BuildSketch(Plane.XY.offset(34)):
        with Locations((13.9653496444, 0.8634440601)):
            Rectangle(F32_W, F32_H)
    extrude(amount=-F33_DEPTH, mode=Mode.SUBTRACT)

    # F34 (add): a face of the model
    f34_faces = [f1_3.faces().sort_by_distance(p)[0] for p in [
        (55.5535885236, -56.5371257993, 9.346366631),
    ]]
    extrude(f34_faces, amount=F34_DEPTH)

    # F35 (cut): a face of the model
    f35_faces = [f1_3.faces().sort_by_distance(p)[0] for p in [
        (50.8535885236, -52.4223612696, 8),
    ]]
    extrude(f35_faces, amount=-F35_DEPTH, mode=Mode.SUBTRACT)

    # F36 (cut): a face of the model
    f36_faces = [f1_3.faces().sort_by_distance(p)[0] for p in [
        (-94.8964114764, 50.2528459728, 13.5),
    ]]
    extrude(f36_faces, amount=-F36_DEPTH, mode=Mode.SUBTRACT)


solid = f1_3.part
